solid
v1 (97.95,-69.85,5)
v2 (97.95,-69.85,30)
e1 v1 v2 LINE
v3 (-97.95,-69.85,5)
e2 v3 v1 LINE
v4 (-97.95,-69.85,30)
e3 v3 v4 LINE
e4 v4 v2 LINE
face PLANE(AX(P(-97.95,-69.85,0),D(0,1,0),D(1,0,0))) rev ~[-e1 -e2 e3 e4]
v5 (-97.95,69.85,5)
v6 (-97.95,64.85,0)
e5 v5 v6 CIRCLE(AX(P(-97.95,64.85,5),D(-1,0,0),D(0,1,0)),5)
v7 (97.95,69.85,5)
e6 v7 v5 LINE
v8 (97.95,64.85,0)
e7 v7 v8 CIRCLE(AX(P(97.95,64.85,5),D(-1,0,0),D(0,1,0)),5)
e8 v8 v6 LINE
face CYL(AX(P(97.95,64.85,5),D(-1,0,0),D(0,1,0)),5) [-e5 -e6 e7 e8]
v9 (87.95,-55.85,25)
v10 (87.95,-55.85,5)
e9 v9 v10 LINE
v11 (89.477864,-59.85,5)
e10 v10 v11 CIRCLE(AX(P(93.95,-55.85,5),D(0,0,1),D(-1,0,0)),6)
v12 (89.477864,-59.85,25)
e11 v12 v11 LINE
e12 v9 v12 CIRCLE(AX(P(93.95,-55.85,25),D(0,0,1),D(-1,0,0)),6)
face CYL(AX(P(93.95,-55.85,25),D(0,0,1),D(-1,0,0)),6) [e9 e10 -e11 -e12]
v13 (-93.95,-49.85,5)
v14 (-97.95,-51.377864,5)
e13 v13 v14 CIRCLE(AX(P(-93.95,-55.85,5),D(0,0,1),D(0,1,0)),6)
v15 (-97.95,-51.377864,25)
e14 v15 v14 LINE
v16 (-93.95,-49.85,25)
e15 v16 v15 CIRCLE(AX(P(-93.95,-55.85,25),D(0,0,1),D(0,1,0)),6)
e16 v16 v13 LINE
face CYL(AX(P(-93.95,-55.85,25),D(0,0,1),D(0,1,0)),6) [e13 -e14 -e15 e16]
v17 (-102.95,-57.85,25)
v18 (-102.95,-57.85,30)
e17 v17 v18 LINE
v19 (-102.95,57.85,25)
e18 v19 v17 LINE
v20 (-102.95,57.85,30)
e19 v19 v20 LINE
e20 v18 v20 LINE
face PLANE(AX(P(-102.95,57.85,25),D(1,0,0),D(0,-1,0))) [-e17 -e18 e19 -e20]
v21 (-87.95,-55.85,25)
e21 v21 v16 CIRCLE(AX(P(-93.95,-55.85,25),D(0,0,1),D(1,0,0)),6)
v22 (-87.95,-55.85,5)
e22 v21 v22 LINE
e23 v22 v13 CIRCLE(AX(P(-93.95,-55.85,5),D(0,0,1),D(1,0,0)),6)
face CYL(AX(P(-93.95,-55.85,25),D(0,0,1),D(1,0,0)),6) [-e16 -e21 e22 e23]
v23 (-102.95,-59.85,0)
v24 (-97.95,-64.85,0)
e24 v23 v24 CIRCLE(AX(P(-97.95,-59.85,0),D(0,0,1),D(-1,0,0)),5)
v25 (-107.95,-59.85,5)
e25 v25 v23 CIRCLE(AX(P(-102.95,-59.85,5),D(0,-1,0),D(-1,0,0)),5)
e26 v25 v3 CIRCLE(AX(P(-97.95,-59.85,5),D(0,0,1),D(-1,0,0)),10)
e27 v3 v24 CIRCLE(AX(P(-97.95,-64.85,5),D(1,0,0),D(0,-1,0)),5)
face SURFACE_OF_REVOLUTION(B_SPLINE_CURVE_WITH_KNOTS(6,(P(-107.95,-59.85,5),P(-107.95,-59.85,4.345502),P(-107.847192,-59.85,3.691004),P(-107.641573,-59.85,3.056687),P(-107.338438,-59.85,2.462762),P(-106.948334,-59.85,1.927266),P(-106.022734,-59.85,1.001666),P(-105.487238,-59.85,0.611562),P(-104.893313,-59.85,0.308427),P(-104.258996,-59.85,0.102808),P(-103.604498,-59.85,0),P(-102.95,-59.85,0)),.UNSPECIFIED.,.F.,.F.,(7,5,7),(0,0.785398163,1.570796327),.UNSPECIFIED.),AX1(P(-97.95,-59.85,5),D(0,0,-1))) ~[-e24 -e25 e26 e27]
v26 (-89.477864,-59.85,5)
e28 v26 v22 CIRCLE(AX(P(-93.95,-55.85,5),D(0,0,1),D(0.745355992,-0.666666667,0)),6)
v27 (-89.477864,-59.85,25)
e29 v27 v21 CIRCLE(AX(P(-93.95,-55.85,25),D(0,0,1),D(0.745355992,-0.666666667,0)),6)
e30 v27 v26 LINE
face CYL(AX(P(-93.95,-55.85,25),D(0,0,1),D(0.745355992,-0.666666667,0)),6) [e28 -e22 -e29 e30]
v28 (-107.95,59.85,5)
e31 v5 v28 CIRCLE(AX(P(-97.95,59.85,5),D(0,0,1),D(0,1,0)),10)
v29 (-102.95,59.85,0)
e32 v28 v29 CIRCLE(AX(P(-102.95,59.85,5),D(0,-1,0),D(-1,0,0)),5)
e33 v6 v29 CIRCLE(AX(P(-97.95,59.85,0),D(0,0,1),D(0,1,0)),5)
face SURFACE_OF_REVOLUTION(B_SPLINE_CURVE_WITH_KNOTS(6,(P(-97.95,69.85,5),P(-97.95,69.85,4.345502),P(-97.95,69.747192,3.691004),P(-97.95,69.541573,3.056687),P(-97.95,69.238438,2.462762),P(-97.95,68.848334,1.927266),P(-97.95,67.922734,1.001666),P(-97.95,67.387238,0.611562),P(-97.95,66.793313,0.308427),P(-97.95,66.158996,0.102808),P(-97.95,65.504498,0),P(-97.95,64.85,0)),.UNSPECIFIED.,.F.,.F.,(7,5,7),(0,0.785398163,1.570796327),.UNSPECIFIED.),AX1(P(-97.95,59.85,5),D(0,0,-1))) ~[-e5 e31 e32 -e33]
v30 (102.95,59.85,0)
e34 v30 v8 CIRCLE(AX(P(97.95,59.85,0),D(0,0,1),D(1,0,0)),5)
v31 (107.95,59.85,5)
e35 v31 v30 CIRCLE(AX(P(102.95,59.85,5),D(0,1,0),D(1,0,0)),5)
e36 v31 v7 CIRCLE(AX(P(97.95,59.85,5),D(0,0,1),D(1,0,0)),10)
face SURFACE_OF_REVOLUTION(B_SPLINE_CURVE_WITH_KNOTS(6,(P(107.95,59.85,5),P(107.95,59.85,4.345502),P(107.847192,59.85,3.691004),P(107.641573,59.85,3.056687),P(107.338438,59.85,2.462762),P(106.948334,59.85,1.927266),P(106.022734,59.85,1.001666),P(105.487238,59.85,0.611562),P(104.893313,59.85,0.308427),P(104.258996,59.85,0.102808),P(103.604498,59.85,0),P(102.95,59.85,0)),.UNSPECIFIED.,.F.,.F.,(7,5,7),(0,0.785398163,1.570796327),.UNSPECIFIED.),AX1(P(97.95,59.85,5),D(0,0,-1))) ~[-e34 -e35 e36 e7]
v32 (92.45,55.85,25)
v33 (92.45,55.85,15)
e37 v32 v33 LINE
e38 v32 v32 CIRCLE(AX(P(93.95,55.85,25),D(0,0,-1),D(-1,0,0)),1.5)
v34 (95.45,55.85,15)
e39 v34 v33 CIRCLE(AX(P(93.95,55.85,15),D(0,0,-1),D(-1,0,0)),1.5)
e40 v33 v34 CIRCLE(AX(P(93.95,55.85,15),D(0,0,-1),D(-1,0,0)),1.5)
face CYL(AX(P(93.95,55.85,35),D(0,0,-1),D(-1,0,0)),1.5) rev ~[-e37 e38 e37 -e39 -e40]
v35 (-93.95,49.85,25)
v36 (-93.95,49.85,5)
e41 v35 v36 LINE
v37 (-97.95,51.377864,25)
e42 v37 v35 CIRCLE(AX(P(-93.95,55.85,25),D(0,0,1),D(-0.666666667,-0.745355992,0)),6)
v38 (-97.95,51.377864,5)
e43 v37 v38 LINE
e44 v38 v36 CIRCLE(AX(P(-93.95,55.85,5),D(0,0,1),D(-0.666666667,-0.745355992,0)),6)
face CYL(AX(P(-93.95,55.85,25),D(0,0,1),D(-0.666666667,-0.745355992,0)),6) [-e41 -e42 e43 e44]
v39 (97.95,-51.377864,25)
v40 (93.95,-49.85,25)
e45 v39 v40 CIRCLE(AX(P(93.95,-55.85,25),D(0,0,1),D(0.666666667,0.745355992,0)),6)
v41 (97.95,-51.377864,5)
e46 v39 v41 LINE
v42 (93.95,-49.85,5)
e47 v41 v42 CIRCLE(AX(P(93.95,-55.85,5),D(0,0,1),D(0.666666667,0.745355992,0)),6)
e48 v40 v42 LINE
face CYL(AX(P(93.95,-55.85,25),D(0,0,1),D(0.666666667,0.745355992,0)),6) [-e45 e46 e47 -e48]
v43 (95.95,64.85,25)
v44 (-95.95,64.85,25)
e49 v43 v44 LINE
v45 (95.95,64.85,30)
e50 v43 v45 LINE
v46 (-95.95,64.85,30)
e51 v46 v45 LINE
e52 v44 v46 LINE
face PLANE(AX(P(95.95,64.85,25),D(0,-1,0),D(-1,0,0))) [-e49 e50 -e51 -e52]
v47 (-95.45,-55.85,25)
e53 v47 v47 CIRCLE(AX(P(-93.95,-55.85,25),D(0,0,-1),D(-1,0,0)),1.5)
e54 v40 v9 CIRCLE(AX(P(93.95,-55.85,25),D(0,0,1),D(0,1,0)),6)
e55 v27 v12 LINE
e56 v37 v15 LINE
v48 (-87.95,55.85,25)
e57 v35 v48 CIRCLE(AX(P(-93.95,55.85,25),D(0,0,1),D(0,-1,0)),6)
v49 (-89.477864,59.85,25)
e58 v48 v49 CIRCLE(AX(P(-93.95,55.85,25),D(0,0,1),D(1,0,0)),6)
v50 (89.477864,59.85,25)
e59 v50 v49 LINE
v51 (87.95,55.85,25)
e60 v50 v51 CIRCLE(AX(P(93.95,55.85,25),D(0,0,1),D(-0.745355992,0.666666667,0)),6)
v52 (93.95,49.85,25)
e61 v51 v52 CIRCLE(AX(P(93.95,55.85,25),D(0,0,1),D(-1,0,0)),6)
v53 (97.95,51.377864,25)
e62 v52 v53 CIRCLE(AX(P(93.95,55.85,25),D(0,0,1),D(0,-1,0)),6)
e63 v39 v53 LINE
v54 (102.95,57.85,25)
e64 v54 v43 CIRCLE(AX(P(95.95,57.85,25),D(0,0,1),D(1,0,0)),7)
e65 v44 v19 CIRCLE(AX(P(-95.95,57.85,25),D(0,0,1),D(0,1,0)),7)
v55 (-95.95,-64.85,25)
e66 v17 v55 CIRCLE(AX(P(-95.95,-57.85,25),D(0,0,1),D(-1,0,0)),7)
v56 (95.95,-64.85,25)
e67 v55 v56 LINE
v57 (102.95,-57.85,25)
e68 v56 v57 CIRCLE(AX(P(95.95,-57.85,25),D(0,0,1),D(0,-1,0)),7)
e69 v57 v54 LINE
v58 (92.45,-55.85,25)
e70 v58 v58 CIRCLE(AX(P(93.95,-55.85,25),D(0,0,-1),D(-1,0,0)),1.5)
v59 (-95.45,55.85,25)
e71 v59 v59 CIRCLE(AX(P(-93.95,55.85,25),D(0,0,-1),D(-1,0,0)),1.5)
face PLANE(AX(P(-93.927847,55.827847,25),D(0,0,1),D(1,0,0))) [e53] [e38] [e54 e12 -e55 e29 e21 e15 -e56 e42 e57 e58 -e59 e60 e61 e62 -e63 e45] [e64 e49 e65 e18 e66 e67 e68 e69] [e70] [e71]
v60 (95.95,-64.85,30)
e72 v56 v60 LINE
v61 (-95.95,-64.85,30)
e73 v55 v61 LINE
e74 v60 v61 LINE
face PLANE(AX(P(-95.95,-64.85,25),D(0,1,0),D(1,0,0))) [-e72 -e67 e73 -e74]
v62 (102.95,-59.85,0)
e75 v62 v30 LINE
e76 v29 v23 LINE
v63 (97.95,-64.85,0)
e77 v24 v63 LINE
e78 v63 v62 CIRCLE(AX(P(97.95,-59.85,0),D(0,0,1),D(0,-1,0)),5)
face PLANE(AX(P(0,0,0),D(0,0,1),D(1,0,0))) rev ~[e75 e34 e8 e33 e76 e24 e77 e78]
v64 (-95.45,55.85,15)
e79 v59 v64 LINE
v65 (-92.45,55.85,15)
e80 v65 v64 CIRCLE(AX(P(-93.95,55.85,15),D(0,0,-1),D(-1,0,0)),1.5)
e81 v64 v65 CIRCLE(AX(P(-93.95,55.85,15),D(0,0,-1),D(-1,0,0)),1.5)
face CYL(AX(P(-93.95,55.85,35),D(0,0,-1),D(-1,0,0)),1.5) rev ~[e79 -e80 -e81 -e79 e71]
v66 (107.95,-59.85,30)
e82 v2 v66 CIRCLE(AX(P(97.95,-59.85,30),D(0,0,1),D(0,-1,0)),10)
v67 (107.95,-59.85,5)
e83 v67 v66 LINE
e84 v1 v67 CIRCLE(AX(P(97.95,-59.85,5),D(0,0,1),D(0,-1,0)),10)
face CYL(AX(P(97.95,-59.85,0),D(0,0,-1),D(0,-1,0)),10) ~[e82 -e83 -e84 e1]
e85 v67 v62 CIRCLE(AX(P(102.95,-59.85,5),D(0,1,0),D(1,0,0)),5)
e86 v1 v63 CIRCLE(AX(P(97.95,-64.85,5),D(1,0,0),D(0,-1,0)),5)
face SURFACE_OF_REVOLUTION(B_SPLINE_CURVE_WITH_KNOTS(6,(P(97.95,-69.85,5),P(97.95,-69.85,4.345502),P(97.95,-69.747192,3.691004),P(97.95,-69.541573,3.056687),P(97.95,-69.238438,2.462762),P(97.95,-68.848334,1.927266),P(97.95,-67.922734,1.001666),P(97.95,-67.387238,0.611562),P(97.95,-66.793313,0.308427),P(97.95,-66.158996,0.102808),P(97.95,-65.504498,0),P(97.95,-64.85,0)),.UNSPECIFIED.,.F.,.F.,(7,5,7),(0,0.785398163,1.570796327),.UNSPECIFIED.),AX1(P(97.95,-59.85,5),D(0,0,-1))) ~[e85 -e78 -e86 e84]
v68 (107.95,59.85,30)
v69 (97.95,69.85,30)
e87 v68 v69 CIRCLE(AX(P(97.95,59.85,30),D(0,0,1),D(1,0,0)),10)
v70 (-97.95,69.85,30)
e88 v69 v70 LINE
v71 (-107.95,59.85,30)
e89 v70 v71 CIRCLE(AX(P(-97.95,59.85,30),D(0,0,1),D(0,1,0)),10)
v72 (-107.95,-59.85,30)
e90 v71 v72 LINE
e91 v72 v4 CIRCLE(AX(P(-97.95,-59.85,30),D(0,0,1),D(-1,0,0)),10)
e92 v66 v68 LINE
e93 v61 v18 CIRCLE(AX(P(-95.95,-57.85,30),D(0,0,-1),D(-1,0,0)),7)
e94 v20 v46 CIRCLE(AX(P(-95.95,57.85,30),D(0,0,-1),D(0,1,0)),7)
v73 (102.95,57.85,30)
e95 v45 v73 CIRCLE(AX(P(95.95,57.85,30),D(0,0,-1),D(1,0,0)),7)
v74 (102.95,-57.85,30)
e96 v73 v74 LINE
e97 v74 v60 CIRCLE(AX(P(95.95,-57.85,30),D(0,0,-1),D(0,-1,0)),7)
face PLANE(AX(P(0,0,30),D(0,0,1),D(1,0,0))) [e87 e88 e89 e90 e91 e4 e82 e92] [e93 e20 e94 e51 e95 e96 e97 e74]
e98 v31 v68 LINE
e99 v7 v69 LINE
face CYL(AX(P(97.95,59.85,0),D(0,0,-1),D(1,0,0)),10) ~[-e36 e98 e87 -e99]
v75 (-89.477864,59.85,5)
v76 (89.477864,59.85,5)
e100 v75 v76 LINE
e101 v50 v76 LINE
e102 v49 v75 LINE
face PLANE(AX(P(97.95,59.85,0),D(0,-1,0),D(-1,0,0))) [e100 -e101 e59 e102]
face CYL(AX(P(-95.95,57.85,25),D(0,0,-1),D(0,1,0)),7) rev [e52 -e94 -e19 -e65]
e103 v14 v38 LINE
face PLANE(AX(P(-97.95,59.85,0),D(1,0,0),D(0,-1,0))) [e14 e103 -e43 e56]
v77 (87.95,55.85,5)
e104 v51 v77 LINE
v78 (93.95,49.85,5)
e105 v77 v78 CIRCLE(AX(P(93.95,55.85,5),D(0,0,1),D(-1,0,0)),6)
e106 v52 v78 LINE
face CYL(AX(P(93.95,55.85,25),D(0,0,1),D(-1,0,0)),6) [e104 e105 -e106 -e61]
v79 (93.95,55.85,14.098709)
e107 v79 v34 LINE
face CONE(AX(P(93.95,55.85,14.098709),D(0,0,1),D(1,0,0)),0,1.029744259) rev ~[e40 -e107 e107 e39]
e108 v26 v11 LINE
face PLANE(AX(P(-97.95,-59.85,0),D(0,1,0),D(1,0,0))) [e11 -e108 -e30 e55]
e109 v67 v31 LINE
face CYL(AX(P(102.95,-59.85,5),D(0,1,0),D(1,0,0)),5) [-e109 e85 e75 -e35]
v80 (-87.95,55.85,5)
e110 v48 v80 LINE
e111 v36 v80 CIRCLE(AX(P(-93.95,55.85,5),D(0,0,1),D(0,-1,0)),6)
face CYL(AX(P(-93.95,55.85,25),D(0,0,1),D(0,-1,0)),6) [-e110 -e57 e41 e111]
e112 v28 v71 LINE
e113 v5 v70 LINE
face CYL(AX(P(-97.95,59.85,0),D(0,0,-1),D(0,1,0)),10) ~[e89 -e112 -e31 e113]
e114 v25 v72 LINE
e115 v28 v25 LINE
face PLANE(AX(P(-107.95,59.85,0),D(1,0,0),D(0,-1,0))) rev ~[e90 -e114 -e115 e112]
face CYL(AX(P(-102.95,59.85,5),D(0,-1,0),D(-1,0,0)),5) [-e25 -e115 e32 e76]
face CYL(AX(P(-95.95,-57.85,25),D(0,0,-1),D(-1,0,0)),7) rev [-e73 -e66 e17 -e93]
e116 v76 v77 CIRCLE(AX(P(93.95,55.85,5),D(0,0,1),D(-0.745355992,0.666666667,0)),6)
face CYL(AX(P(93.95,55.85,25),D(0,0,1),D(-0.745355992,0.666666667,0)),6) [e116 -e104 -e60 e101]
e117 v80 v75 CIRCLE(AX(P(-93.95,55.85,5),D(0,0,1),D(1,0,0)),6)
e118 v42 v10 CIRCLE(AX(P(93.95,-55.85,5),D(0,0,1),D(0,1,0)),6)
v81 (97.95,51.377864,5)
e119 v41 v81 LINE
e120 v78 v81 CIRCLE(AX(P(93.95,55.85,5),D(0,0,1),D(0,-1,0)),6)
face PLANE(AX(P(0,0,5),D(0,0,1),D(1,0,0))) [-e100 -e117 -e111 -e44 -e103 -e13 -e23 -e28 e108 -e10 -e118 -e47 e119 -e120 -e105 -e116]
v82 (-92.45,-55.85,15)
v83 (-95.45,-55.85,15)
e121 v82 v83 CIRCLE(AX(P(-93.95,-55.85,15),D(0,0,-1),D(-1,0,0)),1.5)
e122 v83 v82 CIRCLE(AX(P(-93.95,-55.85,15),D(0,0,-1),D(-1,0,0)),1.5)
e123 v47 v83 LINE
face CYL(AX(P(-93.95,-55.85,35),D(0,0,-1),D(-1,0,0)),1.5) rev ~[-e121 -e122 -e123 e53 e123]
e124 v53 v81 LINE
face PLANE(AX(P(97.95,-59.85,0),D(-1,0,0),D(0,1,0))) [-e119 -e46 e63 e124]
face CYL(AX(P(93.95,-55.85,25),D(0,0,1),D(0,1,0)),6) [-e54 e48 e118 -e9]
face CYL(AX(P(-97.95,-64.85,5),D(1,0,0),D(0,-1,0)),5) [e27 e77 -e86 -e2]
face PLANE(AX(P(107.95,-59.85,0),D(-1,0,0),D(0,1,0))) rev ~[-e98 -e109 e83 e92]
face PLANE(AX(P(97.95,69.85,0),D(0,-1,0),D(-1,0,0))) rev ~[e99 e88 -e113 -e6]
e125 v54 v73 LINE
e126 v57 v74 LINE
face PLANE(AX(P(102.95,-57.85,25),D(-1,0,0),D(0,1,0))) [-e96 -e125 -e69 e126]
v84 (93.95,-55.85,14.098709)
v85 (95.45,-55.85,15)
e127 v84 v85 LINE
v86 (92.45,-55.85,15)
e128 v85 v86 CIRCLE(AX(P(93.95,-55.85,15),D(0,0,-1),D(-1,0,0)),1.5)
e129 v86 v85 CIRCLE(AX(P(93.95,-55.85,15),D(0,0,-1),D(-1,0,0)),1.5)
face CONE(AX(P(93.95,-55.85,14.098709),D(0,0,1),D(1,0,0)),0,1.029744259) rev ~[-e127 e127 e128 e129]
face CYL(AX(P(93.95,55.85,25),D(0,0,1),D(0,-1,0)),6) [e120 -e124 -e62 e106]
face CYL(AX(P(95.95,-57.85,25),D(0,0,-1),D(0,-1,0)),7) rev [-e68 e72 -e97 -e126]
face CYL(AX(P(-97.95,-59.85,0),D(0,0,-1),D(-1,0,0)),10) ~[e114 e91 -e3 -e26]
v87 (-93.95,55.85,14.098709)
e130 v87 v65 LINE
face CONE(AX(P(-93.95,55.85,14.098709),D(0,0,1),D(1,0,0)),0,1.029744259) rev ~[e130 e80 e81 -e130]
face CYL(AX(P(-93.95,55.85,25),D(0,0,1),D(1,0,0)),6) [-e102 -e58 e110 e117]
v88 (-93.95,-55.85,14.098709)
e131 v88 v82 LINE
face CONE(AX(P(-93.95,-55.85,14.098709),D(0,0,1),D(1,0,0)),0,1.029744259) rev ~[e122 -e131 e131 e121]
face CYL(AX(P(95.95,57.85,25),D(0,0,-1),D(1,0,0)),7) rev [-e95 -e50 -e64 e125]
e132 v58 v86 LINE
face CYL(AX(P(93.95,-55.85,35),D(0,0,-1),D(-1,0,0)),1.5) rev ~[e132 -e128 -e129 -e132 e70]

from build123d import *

# Parameters (mm, degrees)
F1_DEPTH  = 30
F2_T      = 10
F5_DEPTH  = 25
F7_W      = 195.9
F7_H      = 119.7
F8_DEPTH  = 5
F9_DEPTH  = 20
F10_D     = 3
F10_DEPTH = 10
F10_TIP   = 0.9012909285
F11_R     = 5


# Not quite as in the source:
# - a shell that OpenCascade refuses in one call is made with other operations: the cavity is built on its own and cut out


with BuildPart() as f1:
    # F0 (on Top) → F1 (new body)
    with BuildSketch(Plane.XY):
        with BuildLine():
            Line((-97.95, -69.85), (97.95, -69.85))
            ThreePointArc((97.95, -69.85), (105.0210678119, -66.9210678119), (107.95, -59.85))
            Line((107.95, -59.85), (107.95, 59.85))
            ThreePointArc((107.95, 59.85), (105.0210678119, 66.9210678119), (97.95, 69.85))
            Line((97.95, 69.85), (-97.95, 69.85))
            ThreePointArc((-97.95, 69.85), (-105.0210678119, 66.9210678119), (-107.95, 59.85))
            Line((-107.95, 59.85), (-107.95, -59.85))
            ThreePointArc((-107.95, -59.85), (-105.0210678119, -66.9210678119), (-97.95, -69.85))
        make_face()
    extrude(amount=F1_DEPTH)

    # F2: shell of thickness 10, made by hand


with BuildPart() as f2_core1:
    # F2_t2: copy of F1
    add(f1.part)

    # the walls: a layer under each face that stays
    f2_faces = [f2_core1.faces().sort_by_distance(p)[0] for p in [
        (0, -69.85, 15),
        (107.95, 0, 15),
        (0, 69.85, 15),
        (-107.95, 0, 15),
        (0, 0, 0),
    ]]
    thicken(f2_faces, amount=-F2_T, mode=Mode.SUBTRACT)


with BuildPart() as f1_1:
    add(f1.part)

    # what is left inside the walls is the cavity
    f2_cavity = [f2_core1.part.solids().sort_by_distance(p)[0] for p in [
        (0, -19.95, 10.1),
    ]]
    add(f2_cavity, mode=Mode.SUBTRACT)

    # F4 (on offset) → F5 (cut)
    with BuildSketch(Plane.XY.offset(25)):
        with BuildLine():
            Line((-95.95, -64.85), (95.95, -64.85))
            ThreePointArc((95.95, -64.85), (100.8997474683, -62.7997474683), (102.95, -57.85))
            Line((102.95, -57.85), (102.95, 57.85))
            ThreePointArc((102.95, 57.85), (100.8997474683, 62.7997474683), (95.95, 64.85))
            Line((95.95, 64.85), (-95.95, 64.85))
            ThreePointArc((-95.95, 64.85), (-100.8997474683, 62.7997474683), (-102.95, 57.85))
            Line((-102.95, 57.85), (-102.95, -57.85))
            ThreePointArc((-102.95, -57.85), (-100.8997474683, -62.7997474683), (-95.95, -64.85))
        make_face()
    extrude(amount=F5_DEPTH, mode=Mode.SUBTRACT)

    # F7 (on face) → F8 (cut)
    with BuildSketch(Plane.XY.offset(10)):
        Rectangle(F7_W, F7_H)
    extrude(amount=-F8_DEPTH, mode=Mode.SUBTRACT)

    # F6 (on face) → F9 (join, through all)
    with BuildSketch(Plane.XY.offset(25)):
        with BuildLine():
            Line((-93.95, 49.85), (-93.95, 55.85))
            Line((-93.95, 55.85), (-87.95, 55.85))
            ThreePointArc((-87.95, 55.85), (-88.3449658462, 57.9909325386), (-89.477864045, 59.85))
            Line((-89.477864045, 59.85), (-97.95, 59.85))
            Line((-97.95, 59.85), (-97.95, 51.377864045))
            ThreePointArc((-97.95, 51.377864045), (-96.0909325386, 50.2449658462), (-93.95, 49.85))
        make_face()
        with BuildLine():
            Line((-87.95, 55.85), (-93.95, 55.85))
            Line((-93.95, 55.85), (-93.95, 49.85))
            ThreePointArc((-93.95, 49.85), (-89.7073593129, 51.6073593129), (-87.95, 55.85))
        make_face()
        with BuildLine():
            Line((93.95, 55.85), (87.95, 55.85))
            ThreePointArc((87.95, 55.85), (89.7073593129, 51.6073593129), (93.95, 49.85))
            Line((93.95, 49.85), (93.95, 55.85))
        make_face()
        with BuildLine():
            ThreePointArc((89.477864045, 59.85), (88.3449658462, 57.9909325386), (87.95, 55.85))
            Line((87.95, 55.85), (93.95, 55.85))
            Line((93.95, 55.85), (93.95, 49.85))
            ThreePointArc((93.95, 49.85), (96.0909325386, 50.2449658462), (97.95, 51.377864045))
            Line((97.95, 51.377864045), (97.95, 59.85))
            Line((97.95, 59.85), (89.477864045, 59.85))
        make_face()
        with BuildLine():
            Line((93.95, -55.85), (93.95, -49.85))
            ThreePointArc((93.95, -49.85), (89.7073593129, -51.6073593129), (87.95, -55.85))
            Line((87.95, -55.85), (93.95, -55.85))
        make_face()
        with BuildLine():
            ThreePointArc((97.95, -51.377864045), (96.0909325386, -50.2449658462), (93.95, -49.85))
            Line((93.95, -49.85), (93.95, -55.85))
            Line((93.95, -55.85), (87.95, -55.85))
            ThreePointArc((87.95, -55.85), (88.3449658462, -57.9909325386), (89.477864045, -59.85))
            Line((89.477864045, -59.85), (97.95, -59.85))
            Line((97.95, -59.85), (97.95, -51.377864045))
        make_face()
        with BuildLine():
            Line((-93.95, -55.85), (-93.95, -49.85))
            ThreePointArc((-93.95, -49.85), (-96.0909325386, -50.2449658462), (-97.95, -51.377864045))
            Line((-97.95, -51.377864045), (-97.95, -59.85))
            Line((-97.95, -59.85), (-89.477864045, -59.85))
            ThreePointArc((-89.477864045, -59.85), (-88.3449658462, -57.9909325386), (-87.95, -55.85))
            Line((-87.95, -55.85), (-93.95, -55.85))
        make_face()
        with BuildLine():
            ThreePointArc((-87.95, -55.85), (-89.7073593129, -51.6073593129), (-93.95, -49.85))
            Line((-93.95, -49.85), (-93.95, -55.85))
            Line((-93.95, -55.85), (-87.95, -55.85))
        make_face()
    extrude(amount=-F9_DEPTH)

    # F10
    with Locations(Plane.XY.offset(25)):
        with Locations((-93.95, 55.85), (-93.95, -55.85), (93.95, -55.85), (93.95, 55.85)):
            Hole(F10_D / 2, depth=F10_DEPTH)
            with Locations((0, 0, -(F10_DEPTH + F10_TIP / 2))):  # 118° drill point
                Cone(0, F10_D / 2, F10_TIP, mode=Mode.SUBTRACT)

    # F11
    f11_edges = [f1_1.edges().sort_by_distance(p)[0] for p in [
        (-107.95, 0, 0),
    ]]
    fillet(f11_edges, radius=F11_R)


solid = f1_1.part
